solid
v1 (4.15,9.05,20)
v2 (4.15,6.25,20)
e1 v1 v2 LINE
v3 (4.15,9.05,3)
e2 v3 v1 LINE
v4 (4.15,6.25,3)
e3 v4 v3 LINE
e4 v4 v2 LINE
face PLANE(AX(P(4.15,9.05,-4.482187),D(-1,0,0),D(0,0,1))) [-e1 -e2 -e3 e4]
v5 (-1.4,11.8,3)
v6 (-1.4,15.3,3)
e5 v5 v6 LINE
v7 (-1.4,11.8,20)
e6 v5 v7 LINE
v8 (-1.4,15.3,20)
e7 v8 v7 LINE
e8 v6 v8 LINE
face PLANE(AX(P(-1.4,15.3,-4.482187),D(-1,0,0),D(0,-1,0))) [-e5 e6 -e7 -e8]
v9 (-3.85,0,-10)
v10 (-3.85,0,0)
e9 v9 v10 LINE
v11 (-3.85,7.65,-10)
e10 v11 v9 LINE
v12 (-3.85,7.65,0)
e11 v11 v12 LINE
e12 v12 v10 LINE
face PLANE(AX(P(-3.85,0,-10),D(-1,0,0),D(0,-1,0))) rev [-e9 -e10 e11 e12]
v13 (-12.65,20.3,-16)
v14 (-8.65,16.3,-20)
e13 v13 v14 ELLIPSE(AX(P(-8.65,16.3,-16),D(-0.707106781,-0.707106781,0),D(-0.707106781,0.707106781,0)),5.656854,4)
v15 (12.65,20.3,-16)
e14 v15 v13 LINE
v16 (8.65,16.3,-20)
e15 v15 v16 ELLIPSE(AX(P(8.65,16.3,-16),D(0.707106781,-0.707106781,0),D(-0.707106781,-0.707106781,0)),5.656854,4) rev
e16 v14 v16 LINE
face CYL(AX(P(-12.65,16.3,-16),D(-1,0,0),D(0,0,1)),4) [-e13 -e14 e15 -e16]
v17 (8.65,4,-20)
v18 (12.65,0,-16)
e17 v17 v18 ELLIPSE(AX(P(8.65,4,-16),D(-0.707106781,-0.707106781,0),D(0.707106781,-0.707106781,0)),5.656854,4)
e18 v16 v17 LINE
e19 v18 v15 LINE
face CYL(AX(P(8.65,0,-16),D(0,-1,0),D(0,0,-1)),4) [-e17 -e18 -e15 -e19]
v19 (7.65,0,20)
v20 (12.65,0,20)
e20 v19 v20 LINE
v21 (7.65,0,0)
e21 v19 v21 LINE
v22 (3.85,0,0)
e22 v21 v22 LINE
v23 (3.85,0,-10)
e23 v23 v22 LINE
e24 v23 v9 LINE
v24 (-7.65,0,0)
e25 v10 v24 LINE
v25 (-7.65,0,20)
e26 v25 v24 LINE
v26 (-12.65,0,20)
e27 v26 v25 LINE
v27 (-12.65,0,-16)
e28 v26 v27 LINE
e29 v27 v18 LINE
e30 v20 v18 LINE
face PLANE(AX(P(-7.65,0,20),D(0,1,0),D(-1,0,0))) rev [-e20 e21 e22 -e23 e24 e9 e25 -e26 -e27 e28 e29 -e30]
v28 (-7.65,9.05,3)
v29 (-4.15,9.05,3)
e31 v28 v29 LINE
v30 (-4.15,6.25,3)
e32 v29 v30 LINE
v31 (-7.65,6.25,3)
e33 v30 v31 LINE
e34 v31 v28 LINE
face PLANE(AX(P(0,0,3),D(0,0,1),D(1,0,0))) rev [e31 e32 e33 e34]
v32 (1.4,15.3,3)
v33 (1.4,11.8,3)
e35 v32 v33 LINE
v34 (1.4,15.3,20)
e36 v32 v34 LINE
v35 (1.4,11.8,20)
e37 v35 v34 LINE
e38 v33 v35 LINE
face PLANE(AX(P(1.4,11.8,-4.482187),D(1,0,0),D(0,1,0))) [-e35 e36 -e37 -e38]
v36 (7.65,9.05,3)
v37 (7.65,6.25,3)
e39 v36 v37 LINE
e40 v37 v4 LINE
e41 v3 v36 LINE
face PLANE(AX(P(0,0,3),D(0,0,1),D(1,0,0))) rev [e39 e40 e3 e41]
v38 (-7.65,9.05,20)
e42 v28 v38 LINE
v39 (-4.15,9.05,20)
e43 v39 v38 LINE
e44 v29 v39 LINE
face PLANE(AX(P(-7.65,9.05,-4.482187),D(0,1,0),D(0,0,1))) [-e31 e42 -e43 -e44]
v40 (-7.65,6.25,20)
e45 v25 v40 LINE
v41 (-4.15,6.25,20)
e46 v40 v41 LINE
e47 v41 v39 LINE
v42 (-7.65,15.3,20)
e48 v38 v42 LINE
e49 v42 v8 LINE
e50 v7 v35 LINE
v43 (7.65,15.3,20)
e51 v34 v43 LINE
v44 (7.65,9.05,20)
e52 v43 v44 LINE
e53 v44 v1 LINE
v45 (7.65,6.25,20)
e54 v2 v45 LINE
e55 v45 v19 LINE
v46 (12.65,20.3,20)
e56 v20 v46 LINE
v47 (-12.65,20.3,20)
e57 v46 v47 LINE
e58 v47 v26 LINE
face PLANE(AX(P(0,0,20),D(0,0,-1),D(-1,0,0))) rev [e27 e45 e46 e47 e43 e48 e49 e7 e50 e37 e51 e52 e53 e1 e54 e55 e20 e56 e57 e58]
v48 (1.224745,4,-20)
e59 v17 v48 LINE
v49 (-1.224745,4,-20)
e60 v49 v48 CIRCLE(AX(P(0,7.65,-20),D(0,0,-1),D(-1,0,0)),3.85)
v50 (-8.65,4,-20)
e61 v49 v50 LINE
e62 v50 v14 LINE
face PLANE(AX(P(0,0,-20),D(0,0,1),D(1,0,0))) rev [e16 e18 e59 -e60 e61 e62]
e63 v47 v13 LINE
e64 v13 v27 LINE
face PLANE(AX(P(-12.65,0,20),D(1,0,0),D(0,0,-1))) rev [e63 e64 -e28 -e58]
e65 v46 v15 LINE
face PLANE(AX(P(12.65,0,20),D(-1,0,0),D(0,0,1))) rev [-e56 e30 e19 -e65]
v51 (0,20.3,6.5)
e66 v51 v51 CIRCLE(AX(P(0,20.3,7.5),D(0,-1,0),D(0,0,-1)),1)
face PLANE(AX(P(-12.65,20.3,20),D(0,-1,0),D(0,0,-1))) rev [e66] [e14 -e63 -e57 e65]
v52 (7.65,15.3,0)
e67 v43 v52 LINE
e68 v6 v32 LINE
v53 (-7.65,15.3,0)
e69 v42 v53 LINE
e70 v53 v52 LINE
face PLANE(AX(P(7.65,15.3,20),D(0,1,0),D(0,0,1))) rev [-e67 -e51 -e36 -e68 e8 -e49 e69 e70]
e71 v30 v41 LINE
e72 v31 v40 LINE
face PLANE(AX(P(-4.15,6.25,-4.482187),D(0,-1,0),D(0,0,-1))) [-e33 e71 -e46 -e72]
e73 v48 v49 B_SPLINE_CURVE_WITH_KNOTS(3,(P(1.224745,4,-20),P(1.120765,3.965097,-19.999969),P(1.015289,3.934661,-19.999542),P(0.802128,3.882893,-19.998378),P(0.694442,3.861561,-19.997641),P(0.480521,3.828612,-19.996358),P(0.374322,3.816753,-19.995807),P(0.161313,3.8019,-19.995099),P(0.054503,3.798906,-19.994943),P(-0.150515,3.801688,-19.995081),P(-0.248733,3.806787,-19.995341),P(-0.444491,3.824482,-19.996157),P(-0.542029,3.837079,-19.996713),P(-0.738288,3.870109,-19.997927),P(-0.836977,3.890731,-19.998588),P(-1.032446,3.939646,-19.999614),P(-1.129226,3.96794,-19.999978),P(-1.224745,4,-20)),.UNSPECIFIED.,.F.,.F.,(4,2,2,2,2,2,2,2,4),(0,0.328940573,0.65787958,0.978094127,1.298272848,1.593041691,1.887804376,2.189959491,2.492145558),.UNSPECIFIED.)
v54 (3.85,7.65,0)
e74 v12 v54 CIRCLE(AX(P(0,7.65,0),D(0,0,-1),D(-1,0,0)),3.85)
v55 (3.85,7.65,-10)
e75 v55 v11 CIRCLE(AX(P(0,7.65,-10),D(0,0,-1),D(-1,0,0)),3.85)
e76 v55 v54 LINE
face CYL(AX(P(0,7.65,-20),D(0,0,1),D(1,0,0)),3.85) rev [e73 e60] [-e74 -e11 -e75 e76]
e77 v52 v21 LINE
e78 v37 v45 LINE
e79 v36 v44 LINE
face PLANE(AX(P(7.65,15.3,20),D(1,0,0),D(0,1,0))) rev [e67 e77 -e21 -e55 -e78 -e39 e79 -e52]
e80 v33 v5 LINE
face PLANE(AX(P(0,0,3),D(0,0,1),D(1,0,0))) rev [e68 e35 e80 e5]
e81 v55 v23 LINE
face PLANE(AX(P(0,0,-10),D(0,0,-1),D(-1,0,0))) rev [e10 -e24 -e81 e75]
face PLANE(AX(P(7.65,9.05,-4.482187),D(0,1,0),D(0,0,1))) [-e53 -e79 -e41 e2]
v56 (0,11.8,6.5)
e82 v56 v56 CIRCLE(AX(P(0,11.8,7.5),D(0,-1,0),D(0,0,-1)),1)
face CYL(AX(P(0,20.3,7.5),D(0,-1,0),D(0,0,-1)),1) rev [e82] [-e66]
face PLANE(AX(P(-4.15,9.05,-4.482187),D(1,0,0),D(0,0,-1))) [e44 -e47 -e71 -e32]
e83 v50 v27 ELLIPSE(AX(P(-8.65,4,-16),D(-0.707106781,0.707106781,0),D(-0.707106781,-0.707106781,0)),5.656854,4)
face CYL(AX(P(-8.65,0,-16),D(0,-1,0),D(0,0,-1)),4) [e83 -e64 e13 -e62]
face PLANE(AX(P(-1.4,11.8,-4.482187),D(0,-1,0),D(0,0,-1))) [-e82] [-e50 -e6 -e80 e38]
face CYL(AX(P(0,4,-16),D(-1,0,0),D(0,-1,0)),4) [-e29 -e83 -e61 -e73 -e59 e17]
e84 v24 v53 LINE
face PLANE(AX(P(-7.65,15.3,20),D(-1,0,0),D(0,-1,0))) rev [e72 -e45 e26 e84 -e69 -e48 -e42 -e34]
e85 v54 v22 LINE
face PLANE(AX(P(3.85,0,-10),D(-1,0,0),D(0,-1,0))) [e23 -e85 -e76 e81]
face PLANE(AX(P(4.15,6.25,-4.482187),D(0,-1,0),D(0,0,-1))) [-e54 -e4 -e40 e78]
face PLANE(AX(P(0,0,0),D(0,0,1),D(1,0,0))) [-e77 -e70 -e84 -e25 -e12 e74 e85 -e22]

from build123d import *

# Parameters (mm, degrees)
RESSALTO_EXTRUS_O1_DEPTH   = 20
ESBO_O2_W                  = 25.3
ESBO_O2_H                  = 20.3
ESBO_O2_R                  = 3.85
RESSALTO_EXTRUS_O2_DEPTH   = 20
CORTE_EXTRUS_O1_DEPTH      = 10
ESBO_O3_W                  = 3.5
ESBO_O3_H                  = 2.8
ESBO_O3_W_2                = 2.8
ESBO_O3_H_2                = 3.5
RESSALTO_EXTRUS_O3_DEPTH   = 17
CORTE_EXTRUS_O2_DEPTH      = 29.180001774
CORTE_EXTRUS_O2_DEPTH_BACK = 29.180001774
ESBO_O4_R                  = 1
FILETE1_R                  = 4


with BuildPart() as part:
    # Esboço1 → Ressalto-extrusão1 (new body)
    with BuildSketch(Plane.XY):
        Polygon((-7.65, 0), (-12.65, 0), (-12.65, 20.3), (12.65, 20.3), (12.65, 0), (7.65, 0), (7.65, 15.3), (-7.65, 15.3), align=None)
    extrude(amount=RESSALTO_EXTRUS_O1_DEPTH)

    # Esboço2 → Ressalto-extrusão2 (add)
    with BuildSketch(Plane(origin=(0, 0, 0), x_dir=(-1, 0, 0), z_dir=(0, 0, -1))):
        with Locations((0, 10.15)):
            Rectangle(ESBO_O2_W, ESBO_O2_H)
        with Locations((0, 7.65)):
            Circle(ESBO_O2_R, mode=Mode.SUBTRACT)
    extrude(amount=RESSALTO_EXTRUS_O2_DEPTH)

    # Esboço2<3> → Corte-extrusão1 (cut)
    with BuildSketch(Plane(origin=(0, 0, 0), x_dir=(-1, 0, 0), z_dir=(0, 0, -1))):
        with BuildLine():
            Line((3.85, 3.8), (2.722361108, 4.927638892))
            ThreePointArc((2.722361108, 4.927638892), (-1.473331215, 4.0930638), (-3.85, 7.65))
            Line((-3.85, 7.65), (-3.85, 0))
            Line((-3.85, 0), (3.85, 0))
            Line((3.85, 0), (3.85, 3.8))
        make_face()
        with BuildLine():
            ThreePointArc((3.85, 7.65), (3.5569362, 6.176668785), (2.722361108, 4.927638892))
            Line((2.722361108, 4.927638892), (3.85, 3.8))
            Line((3.85, 3.8), (3.85, 7.65))
        make_face()
    extrude(amount=CORTE_EXTRUS_O1_DEPTH, mode=Mode.SUBTRACT)

    # Esboço3 → Ressalto-extrusão3 (add)
    with BuildSketch(Plane.XY.offset(20)):
        with Locations((5.9, 7.65)):
            Rectangle(ESBO_O3_W, ESBO_O3_H)
        with Locations((-5.9, 7.65)):
            Rectangle(ESBO_O3_W, ESBO_O3_H)
        with Locations((0, 13.55)):
            Rectangle(ESBO_O3_W_2, ESBO_O3_H_2)
    extrude(amount=-RESSALTO_EXTRUS_O3_DEPTH)

    # Esboço4 → Corte-extrusão2 (cut, two sides: drawn at the far end of the back side and taken through both)
    with BuildSketch(Plane.XZ.offset(-15.3).offset(-CORTE_EXTRUS_O2_DEPTH_BACK)):
        with Locations(Location((0, 7.5, 0), (0, 0, 270))):
            Circle(ESBO_O4_R)
    extrude(amount=CORTE_EXTRUS_O2_DEPTH + CORTE_EXTRUS_O2_DEPTH_BACK, mode=Mode.SUBTRACT)

    # Filete1
    # the kernel refuses this fillet: 4 mm, written as the material it takes off along each edge
    with BuildSketch(Plane(origin=(12.65, -10, -20), x_dir=(-1, 0, 0), z_dir=(0, 1, 0))) as filete1_piece_1:
        with BuildLine():
            CenterArc((FILETE1_R, FILETE1_R), FILETE1_R, 180, 90)
            Line((0, FILETE1_R), (0, 0))
            Line((0, 0), (FILETE1_R, 0))
        make_face()
    extrude(amount=40.3, mode=Mode.SUBTRACT)
    with BuildSketch(Plane(origin=(-22.65, 0, -20), x_dir=(0, 0, 1), z_dir=(1, 0, 0)), Plane(origin=(22.65, 20.3, -20), x_dir=(0, 0, 1), z_dir=(-1, 0, 0))) as filete1_piece_2:
        with BuildLine():
            CenterArc((FILETE1_R, -FILETE1_R), FILETE1_R, 90, 90)
            Line((0, -FILETE1_R), (0, 0))
            Line((0, 0), (FILETE1_R, 0))
        make_face()
    extrude(amount=45.3, mode=Mode.SUBTRACT)
    with BuildSketch(Plane(origin=(-12.65, 30.3, -20), x_dir=(0, 0, 1), z_dir=(0, -1, 0))) as filete1_piece_3:
        with BuildLine():
            CenterArc((FILETE1_R, -FILETE1_R), FILETE1_R, 90, 90)
            Line((0, -FILETE1_R), (0, 0))
            Line((0, 0), (FILETE1_R, 0))
        make_face()
    extrude(amount=40.3, mode=Mode.SUBTRACT)


solid = part.part
